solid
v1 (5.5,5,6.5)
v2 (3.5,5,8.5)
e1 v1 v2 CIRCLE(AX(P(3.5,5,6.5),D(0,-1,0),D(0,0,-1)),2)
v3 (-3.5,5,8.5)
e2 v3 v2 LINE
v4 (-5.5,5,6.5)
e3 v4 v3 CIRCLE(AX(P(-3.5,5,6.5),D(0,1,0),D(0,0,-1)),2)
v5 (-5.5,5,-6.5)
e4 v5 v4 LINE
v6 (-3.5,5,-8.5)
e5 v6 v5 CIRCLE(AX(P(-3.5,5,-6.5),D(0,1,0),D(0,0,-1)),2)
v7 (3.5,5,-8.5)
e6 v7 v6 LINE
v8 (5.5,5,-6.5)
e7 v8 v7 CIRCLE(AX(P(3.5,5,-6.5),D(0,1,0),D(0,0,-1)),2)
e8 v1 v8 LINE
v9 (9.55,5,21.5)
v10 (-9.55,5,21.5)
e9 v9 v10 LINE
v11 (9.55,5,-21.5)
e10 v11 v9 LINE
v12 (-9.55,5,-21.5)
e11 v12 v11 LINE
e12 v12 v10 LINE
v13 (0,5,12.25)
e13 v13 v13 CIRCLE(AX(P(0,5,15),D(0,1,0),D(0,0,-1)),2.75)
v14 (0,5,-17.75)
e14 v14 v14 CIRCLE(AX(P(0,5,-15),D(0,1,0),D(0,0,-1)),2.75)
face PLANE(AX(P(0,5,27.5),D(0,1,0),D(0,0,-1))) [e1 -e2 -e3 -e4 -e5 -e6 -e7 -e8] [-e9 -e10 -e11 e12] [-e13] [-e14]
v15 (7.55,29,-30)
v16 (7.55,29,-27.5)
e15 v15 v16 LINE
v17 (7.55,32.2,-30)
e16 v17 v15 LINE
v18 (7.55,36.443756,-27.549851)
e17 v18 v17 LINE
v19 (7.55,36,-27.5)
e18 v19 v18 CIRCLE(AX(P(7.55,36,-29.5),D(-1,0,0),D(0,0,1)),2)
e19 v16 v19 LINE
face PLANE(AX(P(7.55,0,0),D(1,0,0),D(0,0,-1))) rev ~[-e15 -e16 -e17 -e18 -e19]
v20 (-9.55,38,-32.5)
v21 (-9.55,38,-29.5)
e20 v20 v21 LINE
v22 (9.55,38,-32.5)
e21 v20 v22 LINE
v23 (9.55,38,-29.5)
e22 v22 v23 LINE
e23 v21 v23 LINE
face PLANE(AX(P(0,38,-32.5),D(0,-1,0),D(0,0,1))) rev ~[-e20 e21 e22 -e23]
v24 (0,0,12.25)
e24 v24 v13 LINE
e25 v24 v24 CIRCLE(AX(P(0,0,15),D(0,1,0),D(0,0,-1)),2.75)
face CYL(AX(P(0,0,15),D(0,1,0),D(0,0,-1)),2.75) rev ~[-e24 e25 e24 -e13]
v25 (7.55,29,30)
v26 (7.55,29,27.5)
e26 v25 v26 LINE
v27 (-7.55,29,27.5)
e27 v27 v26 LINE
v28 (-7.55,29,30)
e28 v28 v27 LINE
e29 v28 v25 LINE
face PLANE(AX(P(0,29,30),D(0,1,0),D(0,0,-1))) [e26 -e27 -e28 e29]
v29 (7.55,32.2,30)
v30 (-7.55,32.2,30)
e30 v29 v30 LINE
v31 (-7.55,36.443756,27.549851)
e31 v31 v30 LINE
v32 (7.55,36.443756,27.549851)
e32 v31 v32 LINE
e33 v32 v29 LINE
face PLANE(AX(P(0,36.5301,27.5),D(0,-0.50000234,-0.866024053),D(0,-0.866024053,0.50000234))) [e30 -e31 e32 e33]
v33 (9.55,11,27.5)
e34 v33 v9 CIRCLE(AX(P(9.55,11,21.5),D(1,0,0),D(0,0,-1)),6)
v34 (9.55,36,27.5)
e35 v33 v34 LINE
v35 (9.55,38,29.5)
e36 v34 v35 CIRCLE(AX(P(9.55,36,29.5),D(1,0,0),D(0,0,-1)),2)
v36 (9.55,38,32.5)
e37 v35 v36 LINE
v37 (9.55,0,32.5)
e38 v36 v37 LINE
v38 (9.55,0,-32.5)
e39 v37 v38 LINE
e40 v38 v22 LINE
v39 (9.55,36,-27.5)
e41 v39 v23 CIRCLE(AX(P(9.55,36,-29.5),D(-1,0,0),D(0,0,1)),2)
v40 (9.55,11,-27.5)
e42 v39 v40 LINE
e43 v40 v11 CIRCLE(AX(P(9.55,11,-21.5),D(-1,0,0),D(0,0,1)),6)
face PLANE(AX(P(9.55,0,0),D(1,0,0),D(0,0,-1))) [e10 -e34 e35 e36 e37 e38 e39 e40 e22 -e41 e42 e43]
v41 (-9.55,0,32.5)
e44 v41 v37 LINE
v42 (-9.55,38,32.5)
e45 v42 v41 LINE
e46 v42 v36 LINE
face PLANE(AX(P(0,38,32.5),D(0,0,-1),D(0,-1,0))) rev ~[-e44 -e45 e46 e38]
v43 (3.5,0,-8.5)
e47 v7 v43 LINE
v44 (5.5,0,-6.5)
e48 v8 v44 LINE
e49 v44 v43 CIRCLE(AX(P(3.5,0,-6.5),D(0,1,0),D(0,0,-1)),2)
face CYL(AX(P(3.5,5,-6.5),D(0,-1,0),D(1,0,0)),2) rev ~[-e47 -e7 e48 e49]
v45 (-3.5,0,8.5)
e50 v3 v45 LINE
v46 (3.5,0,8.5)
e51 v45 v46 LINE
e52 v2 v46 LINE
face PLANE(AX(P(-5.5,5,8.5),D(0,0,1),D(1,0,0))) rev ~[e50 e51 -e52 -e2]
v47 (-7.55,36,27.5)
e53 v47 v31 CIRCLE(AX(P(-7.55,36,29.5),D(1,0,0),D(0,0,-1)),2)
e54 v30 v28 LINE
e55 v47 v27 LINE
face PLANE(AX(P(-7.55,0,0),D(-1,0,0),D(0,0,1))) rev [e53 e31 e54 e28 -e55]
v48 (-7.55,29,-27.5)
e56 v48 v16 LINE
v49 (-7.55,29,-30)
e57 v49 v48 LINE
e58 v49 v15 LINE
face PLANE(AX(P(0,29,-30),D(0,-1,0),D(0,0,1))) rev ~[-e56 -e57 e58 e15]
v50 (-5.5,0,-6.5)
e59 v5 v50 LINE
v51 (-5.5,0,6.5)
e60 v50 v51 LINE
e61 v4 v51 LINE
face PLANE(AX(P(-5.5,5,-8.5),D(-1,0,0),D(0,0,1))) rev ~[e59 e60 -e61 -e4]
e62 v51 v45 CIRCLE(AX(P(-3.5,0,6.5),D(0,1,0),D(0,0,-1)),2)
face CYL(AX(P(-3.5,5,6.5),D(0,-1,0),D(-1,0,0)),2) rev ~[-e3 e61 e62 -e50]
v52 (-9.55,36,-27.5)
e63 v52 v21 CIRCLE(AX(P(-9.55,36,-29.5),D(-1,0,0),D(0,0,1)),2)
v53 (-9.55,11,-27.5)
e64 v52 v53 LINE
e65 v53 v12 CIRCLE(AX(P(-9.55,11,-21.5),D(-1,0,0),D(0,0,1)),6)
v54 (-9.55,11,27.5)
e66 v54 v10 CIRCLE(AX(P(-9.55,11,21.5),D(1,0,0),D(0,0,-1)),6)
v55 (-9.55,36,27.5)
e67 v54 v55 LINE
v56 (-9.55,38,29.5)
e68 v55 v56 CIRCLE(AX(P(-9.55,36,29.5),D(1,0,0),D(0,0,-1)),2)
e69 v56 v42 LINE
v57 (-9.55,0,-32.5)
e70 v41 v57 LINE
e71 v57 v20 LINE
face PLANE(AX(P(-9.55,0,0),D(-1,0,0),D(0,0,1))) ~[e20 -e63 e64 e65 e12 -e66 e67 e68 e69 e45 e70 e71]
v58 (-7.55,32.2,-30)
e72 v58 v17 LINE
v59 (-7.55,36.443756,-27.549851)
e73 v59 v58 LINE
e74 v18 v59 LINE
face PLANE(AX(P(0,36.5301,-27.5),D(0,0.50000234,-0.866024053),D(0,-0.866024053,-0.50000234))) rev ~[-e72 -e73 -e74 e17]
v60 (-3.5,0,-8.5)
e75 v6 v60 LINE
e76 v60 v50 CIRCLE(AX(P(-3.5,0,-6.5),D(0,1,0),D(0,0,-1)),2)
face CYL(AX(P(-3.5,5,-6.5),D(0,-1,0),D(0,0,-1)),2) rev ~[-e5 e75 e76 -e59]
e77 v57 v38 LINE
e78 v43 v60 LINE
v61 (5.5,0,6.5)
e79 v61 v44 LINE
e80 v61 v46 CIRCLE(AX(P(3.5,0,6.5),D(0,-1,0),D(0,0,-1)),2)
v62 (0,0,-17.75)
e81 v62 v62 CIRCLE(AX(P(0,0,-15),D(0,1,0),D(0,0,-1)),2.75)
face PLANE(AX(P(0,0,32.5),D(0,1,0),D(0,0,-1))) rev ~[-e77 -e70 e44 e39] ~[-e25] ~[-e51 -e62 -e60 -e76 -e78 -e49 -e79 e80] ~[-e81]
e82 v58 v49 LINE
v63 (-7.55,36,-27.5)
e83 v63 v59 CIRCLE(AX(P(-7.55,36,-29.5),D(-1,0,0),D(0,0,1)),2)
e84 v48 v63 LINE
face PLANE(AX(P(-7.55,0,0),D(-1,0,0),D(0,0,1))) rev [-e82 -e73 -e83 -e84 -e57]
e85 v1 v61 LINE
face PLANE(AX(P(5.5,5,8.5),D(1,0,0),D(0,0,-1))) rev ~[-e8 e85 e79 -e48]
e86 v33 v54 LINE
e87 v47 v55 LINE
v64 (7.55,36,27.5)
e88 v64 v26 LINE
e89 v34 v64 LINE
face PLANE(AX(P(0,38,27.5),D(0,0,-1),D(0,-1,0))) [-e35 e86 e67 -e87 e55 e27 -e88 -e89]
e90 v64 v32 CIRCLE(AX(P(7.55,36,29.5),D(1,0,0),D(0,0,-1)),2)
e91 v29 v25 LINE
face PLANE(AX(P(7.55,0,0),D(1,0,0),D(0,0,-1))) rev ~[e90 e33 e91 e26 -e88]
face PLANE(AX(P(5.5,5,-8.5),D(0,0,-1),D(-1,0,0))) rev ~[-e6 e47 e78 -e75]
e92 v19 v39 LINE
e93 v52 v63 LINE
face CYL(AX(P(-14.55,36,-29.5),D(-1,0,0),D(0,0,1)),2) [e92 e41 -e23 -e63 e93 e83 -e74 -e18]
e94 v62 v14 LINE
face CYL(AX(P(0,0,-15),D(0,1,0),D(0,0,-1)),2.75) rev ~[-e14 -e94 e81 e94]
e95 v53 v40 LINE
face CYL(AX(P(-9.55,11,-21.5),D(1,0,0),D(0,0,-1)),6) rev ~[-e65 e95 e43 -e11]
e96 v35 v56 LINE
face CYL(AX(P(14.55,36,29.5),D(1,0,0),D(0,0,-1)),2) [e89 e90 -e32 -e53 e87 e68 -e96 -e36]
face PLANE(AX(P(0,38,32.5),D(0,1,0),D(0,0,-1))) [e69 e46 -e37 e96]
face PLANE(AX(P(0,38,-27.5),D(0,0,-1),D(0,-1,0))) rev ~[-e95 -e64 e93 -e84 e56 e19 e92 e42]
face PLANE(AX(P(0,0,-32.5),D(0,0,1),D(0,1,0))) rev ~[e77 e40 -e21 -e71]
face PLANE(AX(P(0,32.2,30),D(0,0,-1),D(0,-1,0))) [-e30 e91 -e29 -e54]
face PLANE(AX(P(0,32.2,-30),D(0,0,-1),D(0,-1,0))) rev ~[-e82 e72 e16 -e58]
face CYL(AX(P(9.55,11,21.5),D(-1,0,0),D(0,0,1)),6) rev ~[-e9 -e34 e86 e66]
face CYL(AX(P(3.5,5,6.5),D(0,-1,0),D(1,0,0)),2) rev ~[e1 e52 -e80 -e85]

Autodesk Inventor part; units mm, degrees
ref_plane "YZ Plane" through (0, 0, 0) normal (1, 0, 0) x (0, 1, 0)
ref_plane "XZ Plane" through (0, 0, 0) normal (0, 1, 0) x (-1, 0, 0)
ref_plane "XY Plane" through (0, 0, 0) normal (0, 0, 1) x (1, 0, 0)
sketch "Sketch1" plane through (0, 0, 0) normal (1, 0, 0) x (0, 1, 0)
  line L0 (38, 32.5) -> (0, 32.5)
  line L1 (0, 32.5) -> (0, -32.5)
  line L2 (0, -32.5) -> (38, -32.5)
  line L3 (0, 0) -> (16.8405, 0)
  line L4 (38, 32.5) -> (38, 27.5)
  line L5 (29, 27.5) -> (5, 27.5)
  line L6 (5, 27.5) -> (5, -27.5)
  line L7 (5, -27.5) -> (29, -27.5)
  line L8 (5.264, 15) -> (-3.604, 15) construction
  line L9 (5.264, -15) -> (-3.604, -15) construction
  line L10 (38, 27.5) -> (36.5301, 27.5)
  line L11 (29, 30) -> (29, 27.5)
  line L12 (36.5301, 27.5) -> (32.2, 30)
  line L13 (32.2, 30) -> (29, 30)
  line L14 (38, -32.5) -> (38, -27.5)
  line L15 (38, -27.5) -> (36.5301, -27.5)
  line L16 (29, -30) -> (29, -27.5)
  line L17 (36.5301, -27.5) -> (32.2, -30)
  line L18 (32.2, -30) -> (29, -30)
  dimension "d0" = 5
  dimension "d1" = 30
  dimension "d2" = 65
  dimension "d3" = 38
  dimension "d5" = 3.2
  dimension "d6" = 24
  dimension "d7" = 2.5
  dimension "d8" = 30
  dimension "d9" = 5
  dimension "d10" = 5
  dimension "d30" = 60
extrude "Extrusion1" add sketch "Sketch1" along normal mid plane 15.1
sketch "Sketch2" plane through (7.55, 0, 0) normal (1, 0, 0) x (0, 0, -1)
  line L0 (32.5, 38) -> (27.5, 38) projected
  line L1 (27.5, 38) -> (27.5, 36.5301) projected
  line L2 (27.5, 36.5301) -> (30, 32.2) projected
  line L3 (30, 32.2) -> (30, 29) projected
  line L4 (30, 29) -> (27.5, 29) projected
  line L5 (27.5, 29) -> (27.5, 5) projected
  line L6 (27.5, 5) -> (-27.5, 5) projected
  line L7 (-27.5, 5) -> (-27.5, 29) projected
  line L8 (-27.5, 29) -> (-30, 29) projected
  line L9 (-30, 29) -> (-30, 32.2) projected
  line L10 (-30, 32.2) -> (-27.5, 36.5301) projected
  line L11 (-27.5, 36.5301) -> (-27.5, 38) projected
  line L12 (-27.5, 38) -> (-32.5, 38) projected
  line L13 (-32.5, 38) -> (-32.5, 0) projected
  line L14 (-32.5, 0) -> (32.5, 0) projected
  line L15 (32.5, 0) -> (32.5, 38) projected
  line L16 (-30, 32.2) -> (-27.5, 36.5301) projected
  line L17 (-27.5, 5) -> (-27.5, 29) projected
  line L18 (-27.5, 36.5301) -> (-27.5, 29)
  line L19 (27.5, 38) -> (27.5, 36.5301) projected
  line L20 (27.5, 29) -> (27.5, 5) projected
  line L21 (27.5, 36.5301) -> (27.5, 29)
  point P0 (0, 0)
extrude "Extrusion2" add sketch "Sketch2" along normal blind 2
mirror "Mirror1" about plane through (0, 0, 0) normal (1, 0, 0) of "Extrusion2"
fillet "Fillet1" radius 6 2 edges at (0, 5, 27.5) (0, 5, -27.5)
sketch "Sketch3" plane through (9.55, 0, -32.5) normal (0, -1, 0) x (1, 0, 0)
  line L0 (-9.55, 32.5) -> (28.6439, 32.5)
  point P0 (-9.55, 47.5)
  point P1 (-9.55, 17.5)
  dimension "d16" = 30
hole "Hole1" at (0, 0, 15) at (0, 0, -15) direction (0, 1, 0) diameter 5.5 end through all
fillet "Fillet2" radius 2 2 edges at (0, 38, 27.5) (0, 38, -27.5)
sketch "Sketch4" plane through (-9.55, 5, -21.5) normal (0, 1, 0) x (1, 0, 0)
  line L0 (15.05, -13) -> (4.05, -13)
  line L1 (4.05, -13) -> (4.05, -30)
  line L2 (4.05, -30) -> (15.05, -30)
  line L3 (15.05, -30) -> (15.05, -13)
  point P0 (9.55, -21.5)
  point P1 (15.05, -21.5)
  point P2 (9.55, -13)
  dimension "d25" = 17
  dimension "d26" = 11
extrude "Extrusion3" cut sketch "Sketch4" against normal through all
fillet "Fillet3" radius 2 4 edges at (5.5, 2.5, -8.5) (-5.5, 2.5, -8.5) (-5.5, 2.5, 8.5) (5.5, 2.5, 8.5)
properties part number "Base_Lower_v3"
